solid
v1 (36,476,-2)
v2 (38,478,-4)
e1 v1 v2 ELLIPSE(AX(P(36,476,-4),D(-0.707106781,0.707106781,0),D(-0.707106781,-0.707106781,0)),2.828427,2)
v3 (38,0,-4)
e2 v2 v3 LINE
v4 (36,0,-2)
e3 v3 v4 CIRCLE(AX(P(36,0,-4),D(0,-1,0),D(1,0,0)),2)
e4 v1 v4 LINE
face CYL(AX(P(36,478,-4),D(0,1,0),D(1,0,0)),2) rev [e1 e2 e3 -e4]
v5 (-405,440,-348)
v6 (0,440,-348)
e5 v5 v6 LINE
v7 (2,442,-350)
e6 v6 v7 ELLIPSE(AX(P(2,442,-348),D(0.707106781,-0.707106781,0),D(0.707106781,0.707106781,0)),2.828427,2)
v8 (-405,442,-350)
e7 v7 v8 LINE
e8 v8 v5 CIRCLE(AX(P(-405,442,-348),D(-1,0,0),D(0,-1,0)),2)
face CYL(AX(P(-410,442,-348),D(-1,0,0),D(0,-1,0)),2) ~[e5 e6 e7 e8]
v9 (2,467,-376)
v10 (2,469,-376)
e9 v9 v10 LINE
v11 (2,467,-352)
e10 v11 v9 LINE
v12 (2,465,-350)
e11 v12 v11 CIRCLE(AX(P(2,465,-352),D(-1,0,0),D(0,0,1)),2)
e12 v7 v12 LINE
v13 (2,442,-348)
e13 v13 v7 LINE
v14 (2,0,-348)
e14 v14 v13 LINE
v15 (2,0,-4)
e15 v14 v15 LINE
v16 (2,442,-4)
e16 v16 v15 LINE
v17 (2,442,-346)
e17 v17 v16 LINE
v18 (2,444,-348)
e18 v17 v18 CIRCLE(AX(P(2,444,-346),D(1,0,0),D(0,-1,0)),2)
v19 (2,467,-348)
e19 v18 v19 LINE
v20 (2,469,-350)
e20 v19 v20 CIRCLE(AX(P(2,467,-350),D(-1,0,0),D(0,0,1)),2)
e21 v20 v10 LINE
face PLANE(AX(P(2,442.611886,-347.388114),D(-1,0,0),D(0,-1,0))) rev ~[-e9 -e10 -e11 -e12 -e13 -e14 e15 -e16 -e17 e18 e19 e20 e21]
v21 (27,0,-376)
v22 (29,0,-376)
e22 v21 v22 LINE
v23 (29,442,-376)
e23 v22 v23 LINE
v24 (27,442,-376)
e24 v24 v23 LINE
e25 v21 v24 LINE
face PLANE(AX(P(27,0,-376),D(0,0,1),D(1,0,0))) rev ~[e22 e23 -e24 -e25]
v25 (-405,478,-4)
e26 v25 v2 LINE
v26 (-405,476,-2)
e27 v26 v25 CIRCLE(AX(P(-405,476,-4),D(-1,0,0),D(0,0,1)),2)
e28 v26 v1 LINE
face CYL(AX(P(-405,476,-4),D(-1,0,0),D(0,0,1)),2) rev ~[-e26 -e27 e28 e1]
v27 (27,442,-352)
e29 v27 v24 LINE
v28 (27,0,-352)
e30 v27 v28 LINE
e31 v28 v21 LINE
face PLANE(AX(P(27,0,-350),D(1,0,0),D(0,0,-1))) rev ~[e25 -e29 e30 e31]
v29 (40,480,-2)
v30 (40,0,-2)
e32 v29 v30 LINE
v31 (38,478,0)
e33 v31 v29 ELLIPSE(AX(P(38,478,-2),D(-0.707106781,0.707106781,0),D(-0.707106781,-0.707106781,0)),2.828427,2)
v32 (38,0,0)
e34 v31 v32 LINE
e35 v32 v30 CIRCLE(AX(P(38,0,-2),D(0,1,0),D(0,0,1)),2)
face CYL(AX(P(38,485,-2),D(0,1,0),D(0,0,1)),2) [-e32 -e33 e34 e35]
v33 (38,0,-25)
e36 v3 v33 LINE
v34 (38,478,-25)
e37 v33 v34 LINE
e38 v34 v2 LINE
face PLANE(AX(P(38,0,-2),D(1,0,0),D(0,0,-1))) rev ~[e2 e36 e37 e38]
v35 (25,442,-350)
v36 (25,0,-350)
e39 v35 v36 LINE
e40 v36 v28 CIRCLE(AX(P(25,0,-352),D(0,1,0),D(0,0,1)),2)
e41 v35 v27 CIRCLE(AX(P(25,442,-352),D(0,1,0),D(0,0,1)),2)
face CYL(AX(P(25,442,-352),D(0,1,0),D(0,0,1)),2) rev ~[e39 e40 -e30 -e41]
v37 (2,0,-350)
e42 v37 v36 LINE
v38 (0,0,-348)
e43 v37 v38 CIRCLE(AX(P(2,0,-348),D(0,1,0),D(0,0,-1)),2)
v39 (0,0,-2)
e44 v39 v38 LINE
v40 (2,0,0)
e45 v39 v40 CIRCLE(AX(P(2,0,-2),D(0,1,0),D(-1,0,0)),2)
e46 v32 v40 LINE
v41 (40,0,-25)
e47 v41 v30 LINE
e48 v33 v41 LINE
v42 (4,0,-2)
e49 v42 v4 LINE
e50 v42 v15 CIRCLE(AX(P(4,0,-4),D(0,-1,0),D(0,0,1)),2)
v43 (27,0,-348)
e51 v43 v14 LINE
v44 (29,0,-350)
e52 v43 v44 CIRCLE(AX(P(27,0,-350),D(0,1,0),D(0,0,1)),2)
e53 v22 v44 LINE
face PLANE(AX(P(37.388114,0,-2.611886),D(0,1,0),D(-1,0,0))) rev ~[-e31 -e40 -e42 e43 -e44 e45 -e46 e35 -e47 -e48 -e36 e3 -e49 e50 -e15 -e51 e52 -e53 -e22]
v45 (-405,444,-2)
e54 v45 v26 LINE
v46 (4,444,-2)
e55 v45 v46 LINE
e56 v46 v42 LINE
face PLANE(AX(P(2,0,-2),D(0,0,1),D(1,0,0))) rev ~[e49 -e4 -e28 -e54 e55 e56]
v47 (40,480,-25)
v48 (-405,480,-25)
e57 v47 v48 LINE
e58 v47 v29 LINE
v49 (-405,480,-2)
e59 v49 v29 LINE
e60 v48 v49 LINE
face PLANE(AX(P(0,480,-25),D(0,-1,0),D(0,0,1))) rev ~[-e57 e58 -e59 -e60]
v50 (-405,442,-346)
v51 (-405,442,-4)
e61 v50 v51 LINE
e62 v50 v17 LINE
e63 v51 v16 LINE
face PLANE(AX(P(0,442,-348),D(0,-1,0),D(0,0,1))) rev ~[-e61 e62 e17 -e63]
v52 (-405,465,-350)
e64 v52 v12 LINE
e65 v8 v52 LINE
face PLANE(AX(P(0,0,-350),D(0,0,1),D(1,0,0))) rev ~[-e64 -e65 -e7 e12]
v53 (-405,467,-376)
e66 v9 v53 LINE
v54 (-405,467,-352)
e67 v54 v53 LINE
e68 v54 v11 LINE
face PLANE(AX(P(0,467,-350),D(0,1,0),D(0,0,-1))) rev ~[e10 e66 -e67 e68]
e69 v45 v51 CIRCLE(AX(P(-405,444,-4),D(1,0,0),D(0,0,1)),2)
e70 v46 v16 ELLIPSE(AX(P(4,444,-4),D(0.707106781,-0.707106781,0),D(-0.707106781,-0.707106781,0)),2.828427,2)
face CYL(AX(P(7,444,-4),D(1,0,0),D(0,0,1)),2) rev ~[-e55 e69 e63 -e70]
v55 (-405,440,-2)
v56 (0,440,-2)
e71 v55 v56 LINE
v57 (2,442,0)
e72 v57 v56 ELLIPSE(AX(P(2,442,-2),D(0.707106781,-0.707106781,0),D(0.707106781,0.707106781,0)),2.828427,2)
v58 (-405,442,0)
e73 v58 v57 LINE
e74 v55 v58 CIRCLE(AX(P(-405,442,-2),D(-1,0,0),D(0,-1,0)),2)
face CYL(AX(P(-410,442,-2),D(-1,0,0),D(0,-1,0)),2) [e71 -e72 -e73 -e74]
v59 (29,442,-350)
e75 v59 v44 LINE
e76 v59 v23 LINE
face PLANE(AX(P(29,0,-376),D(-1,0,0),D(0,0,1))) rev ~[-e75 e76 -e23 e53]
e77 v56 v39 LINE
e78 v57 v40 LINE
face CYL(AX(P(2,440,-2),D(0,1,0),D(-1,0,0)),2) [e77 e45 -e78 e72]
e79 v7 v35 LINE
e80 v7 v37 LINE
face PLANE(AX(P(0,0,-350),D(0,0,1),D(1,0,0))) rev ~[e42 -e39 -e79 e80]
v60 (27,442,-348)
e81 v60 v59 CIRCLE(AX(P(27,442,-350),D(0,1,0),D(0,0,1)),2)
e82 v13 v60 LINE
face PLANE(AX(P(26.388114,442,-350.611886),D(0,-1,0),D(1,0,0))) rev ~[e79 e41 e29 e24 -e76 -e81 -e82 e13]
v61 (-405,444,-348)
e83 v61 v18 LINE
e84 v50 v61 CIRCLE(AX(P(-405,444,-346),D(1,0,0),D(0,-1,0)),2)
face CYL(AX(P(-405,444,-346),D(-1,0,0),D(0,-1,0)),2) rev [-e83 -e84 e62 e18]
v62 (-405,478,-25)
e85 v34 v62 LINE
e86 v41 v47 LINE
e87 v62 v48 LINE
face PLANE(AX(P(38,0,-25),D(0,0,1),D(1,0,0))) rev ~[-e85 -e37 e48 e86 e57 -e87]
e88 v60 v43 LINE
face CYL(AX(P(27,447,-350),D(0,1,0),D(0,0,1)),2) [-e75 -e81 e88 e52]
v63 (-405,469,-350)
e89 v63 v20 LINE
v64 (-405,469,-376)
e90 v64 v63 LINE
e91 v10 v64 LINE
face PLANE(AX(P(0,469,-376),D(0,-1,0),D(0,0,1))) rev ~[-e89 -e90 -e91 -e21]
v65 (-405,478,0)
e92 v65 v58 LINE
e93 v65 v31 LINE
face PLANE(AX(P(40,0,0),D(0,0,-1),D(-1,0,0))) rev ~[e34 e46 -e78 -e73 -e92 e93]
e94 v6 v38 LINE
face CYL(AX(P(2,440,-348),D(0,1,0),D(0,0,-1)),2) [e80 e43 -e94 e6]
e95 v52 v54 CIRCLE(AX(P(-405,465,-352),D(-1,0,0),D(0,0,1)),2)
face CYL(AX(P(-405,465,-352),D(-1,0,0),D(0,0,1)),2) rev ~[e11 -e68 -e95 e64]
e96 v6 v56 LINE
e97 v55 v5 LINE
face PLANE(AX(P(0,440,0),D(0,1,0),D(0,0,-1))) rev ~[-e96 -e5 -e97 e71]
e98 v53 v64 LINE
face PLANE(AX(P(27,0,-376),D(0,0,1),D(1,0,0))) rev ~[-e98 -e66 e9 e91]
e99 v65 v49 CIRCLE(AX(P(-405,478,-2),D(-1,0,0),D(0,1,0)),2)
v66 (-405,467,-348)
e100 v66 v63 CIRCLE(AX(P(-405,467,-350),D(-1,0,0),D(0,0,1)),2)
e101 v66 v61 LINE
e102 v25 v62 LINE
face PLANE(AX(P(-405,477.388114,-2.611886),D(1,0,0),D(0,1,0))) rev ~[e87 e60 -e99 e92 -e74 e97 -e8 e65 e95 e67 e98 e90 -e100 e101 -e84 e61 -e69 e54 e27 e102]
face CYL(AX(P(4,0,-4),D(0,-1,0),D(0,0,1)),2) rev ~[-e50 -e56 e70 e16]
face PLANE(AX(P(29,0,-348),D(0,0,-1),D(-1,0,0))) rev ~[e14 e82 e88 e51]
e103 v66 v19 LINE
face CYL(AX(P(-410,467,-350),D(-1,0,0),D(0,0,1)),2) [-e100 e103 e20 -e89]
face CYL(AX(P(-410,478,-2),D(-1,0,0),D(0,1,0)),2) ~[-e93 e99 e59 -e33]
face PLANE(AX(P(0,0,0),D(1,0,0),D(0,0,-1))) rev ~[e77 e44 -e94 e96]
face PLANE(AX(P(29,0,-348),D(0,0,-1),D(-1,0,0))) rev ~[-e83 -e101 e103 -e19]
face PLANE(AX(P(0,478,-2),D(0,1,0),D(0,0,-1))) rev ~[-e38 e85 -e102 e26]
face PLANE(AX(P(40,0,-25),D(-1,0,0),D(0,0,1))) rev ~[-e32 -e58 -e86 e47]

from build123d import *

# Parameters (mm, degrees)
F3_W         = 27
F3_H         = 27
F4_DEPTH     = 30
F5_T1_DEPTH  = 407
F5_T3_DEPTH  = 443
F5_T5_DEPTH  = 442
F5_T7_DEPTH  = 478
F5_T13_DEPTH = 447
F5_T17_DEPTH = 412
F5_T20_DEPTH = 417
F5_T22_DEPTH = 455
F5_T24_DEPTH = 410
F5_T26_DEPTH = 445
F5_T28_DEPTH = 490
F5_T30_DEPTH = 452
F5_T36_DEPTH = 415
F5_T40_DEPTH = 450
F5_T47_DEPTH = 415
F5_T51_DEPTH = 450


# Not quite as in the source:
# - a fillet or chamfer that OpenCascade refuses, or shapes differently, is made with other operations: its cross-section is extruded or revolved along the edge and cut away or added


with BuildPart() as f2:
    # F2: sweep along a path in F1
    with BuildLine(Plane.XY) as f2_path:
        Line((0, 0), (0, 440))
        Line((0, 440), (-405, 440))
    # F0 (on Front) → F2 (sweep)
    with BuildSketch(Plane.XZ):
        Polygon((38, -2), (38, -25), (40, -25), (40, 0), (0, 0), (0, -350), (27, -350), (27, -376), (29, -376), (29, -348), (2, -348), (2, -2), align=None)
    sweep(path=f2_path.line, transition=Transition.RIGHT)

    # F3 (on face) → F4 (cut)
    with BuildSketch(Plane.XY.offset(-348)):
        with Locations((15.5, 455.5)):
            Rectangle(F3_W, F3_H)
    extrude(amount=-F4_DEPTH, mode=Mode.SUBTRACT)

    # F5: fillet of radius 2 on 15 edges, made by hand

    # F5_s2 → F5_t1 (join)
    with BuildSketch(Plane.YZ.offset(-405)):
        with BuildLine():
            ThreePointArc((442, -346), (442.5857864376, -347.4142135624), (444, -348))
            Line((444, -348), (442, -348))
            Line((442, -348), (442, -346))
        make_face()
        with BuildLine():
            ThreePointArc((465, -350), (466.4142135624, -350.5857864376), (467, -352))
            Line((467, -352), (467, -350))
            Line((467, -350), (465, -350))
        make_face()
        with BuildLine():
            ThreePointArc((444, -2), (442.5857864376, -2.5857864376), (442, -4))
            Line((442, -4), (442, -2))
            Line((442, -2), (444, -2))
        make_face()
    extrude(amount=F5_T1_DEPTH)

    # F5_s4 → F5_t3 (join)
    with BuildSketch(Plane.YZ.offset(-405)):
        with BuildLine():
            ThreePointArc((476, -2), (477.4142135624, -2.5857864376), (478, -4))
            Line((478, -4), (478, -2))
            Line((478, -2), (476, -2))
        make_face()
    extrude(amount=F5_T3_DEPTH)

    # F5_s6 → F5_t5 (join)
    with BuildSketch(Plane.XZ.offset(-442)):
        with BuildLine():
            ThreePointArc((25, -350), (26.4142135624, -350.5857864376), (27, -352))
            Line((27, -352), (27, -350))
            Line((27, -350), (25, -350))
        make_face()
        with BuildLine():
            ThreePointArc((4, -2), (2.5857864376, -2.5857864376), (2, -4))
            Line((2, -4), (2, -2))
            Line((2, -2), (4, -2))
        make_face()
    extrude(amount=F5_T5_DEPTH)

    # F5_s8 → F5_t7 (join)
    with BuildSketch(Plane.XZ.offset(-478)):
        with BuildLine():
            ThreePointArc((38, -4), (37.4142135624, -2.5857864376), (36, -2))
            Line((36, -2), (38, -2))
            Line((38, -2), (38, -4))
        make_face()
    extrude(amount=F5_T7_DEPTH)


with BuildPart() as f5_tool11:
    # F5_s12 → F5_t13 (new body)
    with BuildSketch(Plane.XZ):
        with BuildLine():
            ThreePointArc((4, -2), (2.5857864376, -2.5857864376), (2, -4))
            Line((2, -4), (2, -2))
            Line((2, -2), (4, -2))
        make_face()
    extrude(amount=-F5_T13_DEPTH)

    split(bisect_by=Plane.XZ.offset(-442), keep=Keep.BOTTOM)


with BuildPart() as f5_tool15:
    # F5_s16 → F5_t17 (new body)
    with BuildSketch(Plane.YZ.offset(7)):
        with BuildLine():
            ThreePointArc((444, -2), (442.5857864376, -2.5857864376), (442, -4))
            Line((442, -4), (442, -2))
            Line((442, -2), (444, -2))
        make_face()
    extrude(amount=-F5_T17_DEPTH)

    split(bisect_by=Plane.YZ.offset(2), keep=Keep.TOP)


with BuildPart() as f5_tool11_1:
    add(f5_tool11.part)

    # F5_t19: intersect F5_tool15
    add(f5_tool15.part, mode=Mode.INTERSECT)


with BuildPart() as f2_1:
    add(f2.part)

    # F5_t9: union F5_tool11
    add(f5_tool11_1.part)

    # F5_s21 → F5_t20 (cut)
    with BuildSketch(Plane.YZ.offset(-410)):
        with BuildLine():
            ThreePointArc((467, -348), (468.4142135624, -348.5857864376), (469, -350))
            Line((469, -350), (469, -348))
            Line((469, -348), (467, -348))
        make_face()
    extrude(amount=F5_T20_DEPTH, mode=Mode.SUBTRACT)

    # F5_s23 → F5_t22 (cut)
    with BuildSketch(Plane.YZ.offset(-410)):
        with BuildLine():
            ThreePointArc((480, -2), (479.4142135624, -0.5857864376), (478, 0))
            Line((478, 0), (480, 0))
            Line((480, 0), (480, -2))
        make_face()
    extrude(amount=F5_T22_DEPTH, mode=Mode.SUBTRACT)

    # F5_s25 → F5_t24 (cut)
    with BuildSketch(Plane.YZ.offset(-410)):
        with BuildLine():
            ThreePointArc((440, -2), (440.5857864376, -0.5857864376), (442, 0))
            Line((442, 0), (440, 0))
            Line((440, 0), (440, -2))
        make_face()
        with BuildLine():
            ThreePointArc((440, -348), (440.5857864376, -349.4142135624), (442, -350))
            Line((442, -350), (440, -350))
            Line((440, -350), (440, -348))
        make_face()
    extrude(amount=F5_T24_DEPTH, mode=Mode.SUBTRACT)

    # F5_s27 → F5_t26 (cut)
    with BuildSketch(Plane.XZ.offset(-440)):
        with BuildLine():
            ThreePointArc((0, -2), (0.5857864376, -0.5857864376), (2, 0))
            Line((2, 0), (0, 0))
            Line((0, 0), (0, -2))
        make_face()
        with BuildLine():
            ThreePointArc((2, -350), (0.5857864376, -349.4142135624), (0, -348))
            Line((0, -348), (0, -350))
            Line((0, -350), (2, -350))
        make_face()
    extrude(amount=F5_T26_DEPTH, mode=Mode.SUBTRACT)

    # F5_s29 → F5_t28 (cut)
    with BuildSketch(Plane.XZ.offset(-485)):
        with BuildLine():
            ThreePointArc((38, 0), (39.4142135624, -0.5857864376), (40, -2))
            Line((40, -2), (40, 0))
            Line((40, 0), (38, 0))
        make_face()
    extrude(amount=F5_T28_DEPTH, mode=Mode.SUBTRACT)

    # F5_s31 → F5_t30 (cut)
    with BuildSketch(Plane.XZ.offset(-447)):
        with BuildLine():
            ThreePointArc((27, -348), (28.4142135624, -348.5857864376), (29, -350))
            Line((29, -350), (29, -348))
            Line((29, -348), (27, -348))
        make_face()
    extrude(amount=F5_T30_DEPTH, mode=Mode.SUBTRACT)


with BuildPart() as f5_tool34:
    # F5_s35 → F5_t36 (new body)
    with BuildSketch(Plane.YZ.offset(5)):
        with BuildLine():
            ThreePointArc((440, -2), (440.5857864376, -0.5857864376), (442, 0))
            Line((442, 0), (440, 0))
            Line((440, 0), (440, -2))
        make_face()
    extrude(amount=-F5_T36_DEPTH)

    split(bisect_by=Plane.YZ, keep=Keep.TOP)


with BuildPart() as f5_tool38:
    # F5_s39 → F5_t40 (new body)
    with BuildSketch(Plane.XZ.offset(5)):
        with BuildLine():
            ThreePointArc((0, -2), (0.5857864376, -0.5857864376), (2, 0))
            Line((2, 0), (0, 0))
            Line((0, 0), (0, -2))
        make_face()
    extrude(amount=-F5_T40_DEPTH)

    split(bisect_by=Plane.XZ.offset(-440), keep=Keep.BOTTOM)


with BuildPart() as f5_tool34_1:
    add(f5_tool34.part)

    # F5_t42: intersect F5_tool38
    add(f5_tool38.part, mode=Mode.INTERSECT)


with BuildPart() as f2_2:
    add(f2_1.part)

    # F5_t32: cut F5_tool34
    add(f5_tool34_1.part, mode=Mode.SUBTRACT)


with BuildPart() as f5_tool45:
    # F5_s46 → F5_t47 (new body)
    with BuildSketch(Plane.YZ.offset(5)):
        with BuildLine():
            ThreePointArc((440, -348), (440.5857864376, -349.4142135624), (442, -350))
            Line((442, -350), (440, -350))
            Line((440, -350), (440, -348))
        make_face()
    extrude(amount=-F5_T47_DEPTH)

    split(bisect_by=Plane.YZ, keep=Keep.TOP)


with BuildPart() as f5_tool49:
    # F5_s50 → F5_t51 (new body)
    with BuildSketch(Plane.XZ.offset(5)):
        with BuildLine():
            ThreePointArc((2, -350), (0.5857864376, -349.4142135624), (0, -348))
            Line((0, -348), (0, -350))
            Line((0, -350), (2, -350))
        make_face()
    extrude(amount=-F5_T51_DEPTH)

    split(bisect_by=Plane.XZ.offset(-440), keep=Keep.BOTTOM)


with BuildPart() as f5_tool45_1:
    add(f5_tool45.part)

    # F5_t53: intersect F5_tool49
    add(f5_tool49.part, mode=Mode.INTERSECT)


with BuildPart() as f2_3:
    add(f2_2.part)

    # F5_t43: cut F5_tool45
    add(f5_tool45_1.part, mode=Mode.SUBTRACT)


solid = f2_3.part
